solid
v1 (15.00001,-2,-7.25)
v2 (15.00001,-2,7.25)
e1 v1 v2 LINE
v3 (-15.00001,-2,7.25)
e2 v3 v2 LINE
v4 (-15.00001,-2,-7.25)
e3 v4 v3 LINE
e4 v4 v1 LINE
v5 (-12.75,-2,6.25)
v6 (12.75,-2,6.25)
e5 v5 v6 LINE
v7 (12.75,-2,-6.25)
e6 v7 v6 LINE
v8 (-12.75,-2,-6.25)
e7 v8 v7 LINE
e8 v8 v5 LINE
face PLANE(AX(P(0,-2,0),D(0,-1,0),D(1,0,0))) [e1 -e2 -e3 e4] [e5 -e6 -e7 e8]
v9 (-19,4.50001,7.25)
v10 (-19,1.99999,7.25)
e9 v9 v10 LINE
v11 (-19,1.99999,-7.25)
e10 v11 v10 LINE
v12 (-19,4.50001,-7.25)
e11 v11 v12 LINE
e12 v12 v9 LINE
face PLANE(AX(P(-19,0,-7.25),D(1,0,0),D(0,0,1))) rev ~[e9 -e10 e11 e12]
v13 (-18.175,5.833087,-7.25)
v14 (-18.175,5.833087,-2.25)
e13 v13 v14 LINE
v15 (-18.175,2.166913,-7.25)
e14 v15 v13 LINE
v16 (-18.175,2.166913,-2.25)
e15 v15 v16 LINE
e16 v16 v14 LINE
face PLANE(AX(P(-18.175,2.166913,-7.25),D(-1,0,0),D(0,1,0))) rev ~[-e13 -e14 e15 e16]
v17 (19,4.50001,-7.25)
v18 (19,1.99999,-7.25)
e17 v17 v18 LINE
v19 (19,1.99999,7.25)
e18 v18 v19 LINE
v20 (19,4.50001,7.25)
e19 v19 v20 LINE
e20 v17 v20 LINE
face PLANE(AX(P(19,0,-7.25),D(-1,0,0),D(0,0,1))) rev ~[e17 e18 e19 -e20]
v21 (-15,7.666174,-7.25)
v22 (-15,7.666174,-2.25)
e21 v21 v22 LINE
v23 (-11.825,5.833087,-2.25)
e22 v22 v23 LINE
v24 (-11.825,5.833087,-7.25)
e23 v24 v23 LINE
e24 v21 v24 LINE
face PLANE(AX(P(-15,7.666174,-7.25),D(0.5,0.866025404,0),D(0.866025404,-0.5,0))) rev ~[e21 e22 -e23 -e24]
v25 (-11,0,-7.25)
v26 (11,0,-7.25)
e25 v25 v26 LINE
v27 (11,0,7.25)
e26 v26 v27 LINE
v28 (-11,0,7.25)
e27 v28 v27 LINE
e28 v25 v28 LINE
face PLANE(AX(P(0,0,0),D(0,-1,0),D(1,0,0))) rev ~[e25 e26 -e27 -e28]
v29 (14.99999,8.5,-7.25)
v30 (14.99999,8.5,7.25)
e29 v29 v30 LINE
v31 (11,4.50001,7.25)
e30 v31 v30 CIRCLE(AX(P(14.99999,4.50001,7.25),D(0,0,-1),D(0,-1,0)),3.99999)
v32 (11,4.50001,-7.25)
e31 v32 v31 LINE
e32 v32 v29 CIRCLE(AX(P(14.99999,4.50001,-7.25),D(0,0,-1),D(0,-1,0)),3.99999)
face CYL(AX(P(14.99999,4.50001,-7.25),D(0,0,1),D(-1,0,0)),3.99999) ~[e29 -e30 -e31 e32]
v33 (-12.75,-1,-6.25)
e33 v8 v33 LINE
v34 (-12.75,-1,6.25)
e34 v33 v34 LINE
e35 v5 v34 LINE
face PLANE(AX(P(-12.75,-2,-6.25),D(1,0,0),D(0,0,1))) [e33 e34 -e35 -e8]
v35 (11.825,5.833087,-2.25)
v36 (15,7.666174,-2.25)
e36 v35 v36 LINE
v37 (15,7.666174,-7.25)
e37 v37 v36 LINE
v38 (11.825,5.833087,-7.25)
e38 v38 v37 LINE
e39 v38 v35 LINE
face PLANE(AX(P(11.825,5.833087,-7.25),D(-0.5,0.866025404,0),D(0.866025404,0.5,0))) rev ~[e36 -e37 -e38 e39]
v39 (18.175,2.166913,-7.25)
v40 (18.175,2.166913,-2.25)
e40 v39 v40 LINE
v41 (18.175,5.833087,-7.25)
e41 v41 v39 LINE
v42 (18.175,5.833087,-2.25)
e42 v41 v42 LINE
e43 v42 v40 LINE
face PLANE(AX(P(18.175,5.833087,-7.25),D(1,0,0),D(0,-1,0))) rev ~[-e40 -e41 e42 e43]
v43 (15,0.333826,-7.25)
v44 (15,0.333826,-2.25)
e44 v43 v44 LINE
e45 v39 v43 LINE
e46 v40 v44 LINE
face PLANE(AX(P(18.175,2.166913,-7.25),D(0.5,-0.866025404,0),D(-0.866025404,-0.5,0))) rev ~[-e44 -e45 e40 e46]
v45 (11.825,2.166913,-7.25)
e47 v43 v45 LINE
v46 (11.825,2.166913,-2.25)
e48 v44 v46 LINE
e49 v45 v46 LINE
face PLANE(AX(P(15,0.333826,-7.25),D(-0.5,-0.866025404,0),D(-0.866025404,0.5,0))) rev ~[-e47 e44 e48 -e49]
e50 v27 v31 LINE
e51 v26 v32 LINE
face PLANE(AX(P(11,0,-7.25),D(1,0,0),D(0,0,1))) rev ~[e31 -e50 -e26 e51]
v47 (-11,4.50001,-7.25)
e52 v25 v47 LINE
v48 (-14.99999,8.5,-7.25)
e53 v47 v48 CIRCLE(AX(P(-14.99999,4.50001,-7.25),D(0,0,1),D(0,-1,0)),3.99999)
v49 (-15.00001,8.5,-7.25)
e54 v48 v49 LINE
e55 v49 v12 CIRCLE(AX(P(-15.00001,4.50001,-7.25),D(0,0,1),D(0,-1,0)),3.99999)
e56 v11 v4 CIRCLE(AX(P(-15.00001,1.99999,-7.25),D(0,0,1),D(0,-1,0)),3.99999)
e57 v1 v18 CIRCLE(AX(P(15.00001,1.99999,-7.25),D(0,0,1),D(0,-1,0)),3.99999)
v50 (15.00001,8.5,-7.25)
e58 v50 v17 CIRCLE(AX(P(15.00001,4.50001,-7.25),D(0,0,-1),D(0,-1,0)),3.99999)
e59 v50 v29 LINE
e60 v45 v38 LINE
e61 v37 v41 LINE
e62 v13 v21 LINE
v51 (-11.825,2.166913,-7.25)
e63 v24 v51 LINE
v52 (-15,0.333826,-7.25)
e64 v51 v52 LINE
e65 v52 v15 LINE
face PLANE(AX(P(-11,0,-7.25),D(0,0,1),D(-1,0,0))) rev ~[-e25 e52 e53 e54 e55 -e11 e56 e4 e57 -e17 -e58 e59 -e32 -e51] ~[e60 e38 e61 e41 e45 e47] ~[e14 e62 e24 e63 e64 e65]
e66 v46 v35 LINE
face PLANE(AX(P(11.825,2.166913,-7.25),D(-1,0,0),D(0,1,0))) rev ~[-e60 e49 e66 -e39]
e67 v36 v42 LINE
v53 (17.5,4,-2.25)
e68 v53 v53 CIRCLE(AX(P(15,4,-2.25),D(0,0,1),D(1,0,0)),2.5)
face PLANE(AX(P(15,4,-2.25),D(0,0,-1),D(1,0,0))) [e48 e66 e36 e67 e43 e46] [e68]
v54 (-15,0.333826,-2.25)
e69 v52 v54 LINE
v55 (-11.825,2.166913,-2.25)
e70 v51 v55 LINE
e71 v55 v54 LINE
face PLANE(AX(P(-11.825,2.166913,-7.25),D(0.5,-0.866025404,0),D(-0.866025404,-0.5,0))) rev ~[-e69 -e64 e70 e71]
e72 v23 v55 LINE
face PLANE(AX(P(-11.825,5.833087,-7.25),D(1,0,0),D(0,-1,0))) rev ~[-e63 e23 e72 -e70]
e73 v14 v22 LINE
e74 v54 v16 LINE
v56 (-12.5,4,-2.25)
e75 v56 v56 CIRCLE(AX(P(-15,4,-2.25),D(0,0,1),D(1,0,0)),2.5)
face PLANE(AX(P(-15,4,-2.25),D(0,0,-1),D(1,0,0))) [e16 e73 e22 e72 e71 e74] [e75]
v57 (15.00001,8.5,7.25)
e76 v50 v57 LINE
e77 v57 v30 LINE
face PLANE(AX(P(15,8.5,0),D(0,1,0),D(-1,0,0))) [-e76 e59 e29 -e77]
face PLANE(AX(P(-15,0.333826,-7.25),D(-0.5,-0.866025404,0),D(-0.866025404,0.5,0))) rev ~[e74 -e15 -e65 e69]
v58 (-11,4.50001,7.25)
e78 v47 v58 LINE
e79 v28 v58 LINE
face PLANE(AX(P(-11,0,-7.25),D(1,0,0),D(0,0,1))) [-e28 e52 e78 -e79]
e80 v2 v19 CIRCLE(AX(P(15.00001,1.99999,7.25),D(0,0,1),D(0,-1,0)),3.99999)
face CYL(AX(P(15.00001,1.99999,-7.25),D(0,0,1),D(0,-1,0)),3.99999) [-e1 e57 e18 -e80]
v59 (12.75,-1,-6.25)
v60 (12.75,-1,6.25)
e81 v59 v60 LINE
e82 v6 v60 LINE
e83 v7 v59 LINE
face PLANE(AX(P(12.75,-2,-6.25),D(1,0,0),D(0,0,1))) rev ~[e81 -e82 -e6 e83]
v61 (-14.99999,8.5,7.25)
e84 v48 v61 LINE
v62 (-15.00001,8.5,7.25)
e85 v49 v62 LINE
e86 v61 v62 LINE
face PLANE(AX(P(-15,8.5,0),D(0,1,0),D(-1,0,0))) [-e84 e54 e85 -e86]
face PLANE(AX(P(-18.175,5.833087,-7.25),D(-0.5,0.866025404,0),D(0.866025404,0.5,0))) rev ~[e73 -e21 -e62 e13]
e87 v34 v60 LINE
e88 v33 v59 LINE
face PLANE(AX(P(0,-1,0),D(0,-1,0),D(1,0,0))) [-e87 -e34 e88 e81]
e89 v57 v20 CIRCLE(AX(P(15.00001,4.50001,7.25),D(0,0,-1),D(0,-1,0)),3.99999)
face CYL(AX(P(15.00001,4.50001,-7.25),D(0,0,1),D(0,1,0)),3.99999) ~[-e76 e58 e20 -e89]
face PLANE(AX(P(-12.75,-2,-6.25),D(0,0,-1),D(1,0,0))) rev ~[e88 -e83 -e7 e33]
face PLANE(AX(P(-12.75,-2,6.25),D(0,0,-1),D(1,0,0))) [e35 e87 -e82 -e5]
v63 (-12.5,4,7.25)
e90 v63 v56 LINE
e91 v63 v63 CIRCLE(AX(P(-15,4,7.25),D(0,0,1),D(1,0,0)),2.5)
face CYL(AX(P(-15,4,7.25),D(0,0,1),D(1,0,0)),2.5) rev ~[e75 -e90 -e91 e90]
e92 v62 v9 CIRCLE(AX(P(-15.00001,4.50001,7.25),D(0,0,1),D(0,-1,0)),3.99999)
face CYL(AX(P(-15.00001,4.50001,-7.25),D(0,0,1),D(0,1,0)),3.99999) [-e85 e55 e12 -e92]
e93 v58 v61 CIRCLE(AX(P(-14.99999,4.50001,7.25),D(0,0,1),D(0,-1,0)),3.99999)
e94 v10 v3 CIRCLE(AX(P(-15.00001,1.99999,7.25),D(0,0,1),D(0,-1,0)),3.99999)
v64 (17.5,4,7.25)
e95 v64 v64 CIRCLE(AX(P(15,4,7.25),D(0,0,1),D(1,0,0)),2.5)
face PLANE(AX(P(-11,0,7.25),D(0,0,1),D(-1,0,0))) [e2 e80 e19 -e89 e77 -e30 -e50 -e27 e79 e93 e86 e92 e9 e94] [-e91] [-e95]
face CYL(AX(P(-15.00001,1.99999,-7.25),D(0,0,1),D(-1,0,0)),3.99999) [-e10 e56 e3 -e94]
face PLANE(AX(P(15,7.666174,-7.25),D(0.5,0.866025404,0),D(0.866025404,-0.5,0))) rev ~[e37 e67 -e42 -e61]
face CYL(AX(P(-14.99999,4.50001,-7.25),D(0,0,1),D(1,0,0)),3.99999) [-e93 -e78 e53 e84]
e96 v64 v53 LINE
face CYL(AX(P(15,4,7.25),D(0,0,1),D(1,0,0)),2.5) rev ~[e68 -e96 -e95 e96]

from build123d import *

# Parameters (mm, degrees)
F0_W     = 38
F0_H     = 14.5
F1_DEPTH = 2
F2_W     = 25.5
F2_H     = 12.5
F3_DEPTH = 1
F4_W     = 8
F4_H     = 14.5
F5_DEPTH = 8.5
F6_R     = 2.5
F7_DEPTH = 25
F9_DEPTH = 5
F10_R    = 3.99999


# Not quite as in the source:
# - a fillet or chamfer is up to 0.001 mm smaller than in the source, because OpenCascade refuses the exact size


with BuildPart() as f1:
    # F0 (on Front) → F1 (new body)
    with BuildSketch(Plane.XZ):
        Rectangle(F0_W, F0_H)
    extrude(amount=F1_DEPTH)

    # F2 (on face) → F3 (cut)
    with BuildSketch(Plane.XZ.offset(2)):
        Rectangle(F2_W, F2_H)
    extrude(amount=-F3_DEPTH, mode=Mode.SUBTRACT)

    # F4 (on face) → F5 (join)
    with BuildSketch(Plane(origin=(0, 0, 0), x_dir=(-1, 0, 0), z_dir=(0, 1, 0))):
        with Locations((15, 0)):
            Rectangle(F4_W, F4_H)
        with Locations((-15, 0)):
            Rectangle(F4_W, F4_H)
    extrude(amount=F5_DEPTH)

    # F6 (on face) → F7 (cut)
    with BuildSketch(Plane.XY.offset(7.25)):
        with Locations((-15, 4)):
            Circle(F6_R)
        with Locations((15, 4)):
            Circle(F6_R)
    extrude(amount=-F7_DEPTH, mode=Mode.SUBTRACT)

    # F8 (on face) → F9 (cut)
    with BuildSketch(Plane(origin=(0, 0, -7.25), x_dir=(1, 0, 0), z_dir=(0, 0, -1))):
        Polygon((-15, -7.6661742094), (-11.825, -5.8330871047), (-11.825, -2.1669128953), (-15, -0.3338257906), (-18.175, -2.1669128953), (-18.175, -5.8330871047), align=None)
        Polygon((15, -7.6661742094), (18.175, -5.8330871047), (18.175, -2.1669128953), (15, -0.3338257906), (11.825, -2.1669128953), (11.825, -5.8330871047), align=None)
    extrude(amount=-F9_DEPTH, mode=Mode.SUBTRACT)

    # F10 (radius 4 in the source; OpenCascade refuses exactly that, so slightly less here)
    f10_edges = [f1.edges().sort_by_distance(p)[0] for p in [
        (-19, -2, 0),
        (-19, 8.5, 0),
        (11, 8.5, 0),
        (19, -2, 0),
        (-11, 8.5, 0),
        (19, 8.5, 0),
    ]]
    fillet(f10_edges, radius=F10_R)


solid = f1.part
